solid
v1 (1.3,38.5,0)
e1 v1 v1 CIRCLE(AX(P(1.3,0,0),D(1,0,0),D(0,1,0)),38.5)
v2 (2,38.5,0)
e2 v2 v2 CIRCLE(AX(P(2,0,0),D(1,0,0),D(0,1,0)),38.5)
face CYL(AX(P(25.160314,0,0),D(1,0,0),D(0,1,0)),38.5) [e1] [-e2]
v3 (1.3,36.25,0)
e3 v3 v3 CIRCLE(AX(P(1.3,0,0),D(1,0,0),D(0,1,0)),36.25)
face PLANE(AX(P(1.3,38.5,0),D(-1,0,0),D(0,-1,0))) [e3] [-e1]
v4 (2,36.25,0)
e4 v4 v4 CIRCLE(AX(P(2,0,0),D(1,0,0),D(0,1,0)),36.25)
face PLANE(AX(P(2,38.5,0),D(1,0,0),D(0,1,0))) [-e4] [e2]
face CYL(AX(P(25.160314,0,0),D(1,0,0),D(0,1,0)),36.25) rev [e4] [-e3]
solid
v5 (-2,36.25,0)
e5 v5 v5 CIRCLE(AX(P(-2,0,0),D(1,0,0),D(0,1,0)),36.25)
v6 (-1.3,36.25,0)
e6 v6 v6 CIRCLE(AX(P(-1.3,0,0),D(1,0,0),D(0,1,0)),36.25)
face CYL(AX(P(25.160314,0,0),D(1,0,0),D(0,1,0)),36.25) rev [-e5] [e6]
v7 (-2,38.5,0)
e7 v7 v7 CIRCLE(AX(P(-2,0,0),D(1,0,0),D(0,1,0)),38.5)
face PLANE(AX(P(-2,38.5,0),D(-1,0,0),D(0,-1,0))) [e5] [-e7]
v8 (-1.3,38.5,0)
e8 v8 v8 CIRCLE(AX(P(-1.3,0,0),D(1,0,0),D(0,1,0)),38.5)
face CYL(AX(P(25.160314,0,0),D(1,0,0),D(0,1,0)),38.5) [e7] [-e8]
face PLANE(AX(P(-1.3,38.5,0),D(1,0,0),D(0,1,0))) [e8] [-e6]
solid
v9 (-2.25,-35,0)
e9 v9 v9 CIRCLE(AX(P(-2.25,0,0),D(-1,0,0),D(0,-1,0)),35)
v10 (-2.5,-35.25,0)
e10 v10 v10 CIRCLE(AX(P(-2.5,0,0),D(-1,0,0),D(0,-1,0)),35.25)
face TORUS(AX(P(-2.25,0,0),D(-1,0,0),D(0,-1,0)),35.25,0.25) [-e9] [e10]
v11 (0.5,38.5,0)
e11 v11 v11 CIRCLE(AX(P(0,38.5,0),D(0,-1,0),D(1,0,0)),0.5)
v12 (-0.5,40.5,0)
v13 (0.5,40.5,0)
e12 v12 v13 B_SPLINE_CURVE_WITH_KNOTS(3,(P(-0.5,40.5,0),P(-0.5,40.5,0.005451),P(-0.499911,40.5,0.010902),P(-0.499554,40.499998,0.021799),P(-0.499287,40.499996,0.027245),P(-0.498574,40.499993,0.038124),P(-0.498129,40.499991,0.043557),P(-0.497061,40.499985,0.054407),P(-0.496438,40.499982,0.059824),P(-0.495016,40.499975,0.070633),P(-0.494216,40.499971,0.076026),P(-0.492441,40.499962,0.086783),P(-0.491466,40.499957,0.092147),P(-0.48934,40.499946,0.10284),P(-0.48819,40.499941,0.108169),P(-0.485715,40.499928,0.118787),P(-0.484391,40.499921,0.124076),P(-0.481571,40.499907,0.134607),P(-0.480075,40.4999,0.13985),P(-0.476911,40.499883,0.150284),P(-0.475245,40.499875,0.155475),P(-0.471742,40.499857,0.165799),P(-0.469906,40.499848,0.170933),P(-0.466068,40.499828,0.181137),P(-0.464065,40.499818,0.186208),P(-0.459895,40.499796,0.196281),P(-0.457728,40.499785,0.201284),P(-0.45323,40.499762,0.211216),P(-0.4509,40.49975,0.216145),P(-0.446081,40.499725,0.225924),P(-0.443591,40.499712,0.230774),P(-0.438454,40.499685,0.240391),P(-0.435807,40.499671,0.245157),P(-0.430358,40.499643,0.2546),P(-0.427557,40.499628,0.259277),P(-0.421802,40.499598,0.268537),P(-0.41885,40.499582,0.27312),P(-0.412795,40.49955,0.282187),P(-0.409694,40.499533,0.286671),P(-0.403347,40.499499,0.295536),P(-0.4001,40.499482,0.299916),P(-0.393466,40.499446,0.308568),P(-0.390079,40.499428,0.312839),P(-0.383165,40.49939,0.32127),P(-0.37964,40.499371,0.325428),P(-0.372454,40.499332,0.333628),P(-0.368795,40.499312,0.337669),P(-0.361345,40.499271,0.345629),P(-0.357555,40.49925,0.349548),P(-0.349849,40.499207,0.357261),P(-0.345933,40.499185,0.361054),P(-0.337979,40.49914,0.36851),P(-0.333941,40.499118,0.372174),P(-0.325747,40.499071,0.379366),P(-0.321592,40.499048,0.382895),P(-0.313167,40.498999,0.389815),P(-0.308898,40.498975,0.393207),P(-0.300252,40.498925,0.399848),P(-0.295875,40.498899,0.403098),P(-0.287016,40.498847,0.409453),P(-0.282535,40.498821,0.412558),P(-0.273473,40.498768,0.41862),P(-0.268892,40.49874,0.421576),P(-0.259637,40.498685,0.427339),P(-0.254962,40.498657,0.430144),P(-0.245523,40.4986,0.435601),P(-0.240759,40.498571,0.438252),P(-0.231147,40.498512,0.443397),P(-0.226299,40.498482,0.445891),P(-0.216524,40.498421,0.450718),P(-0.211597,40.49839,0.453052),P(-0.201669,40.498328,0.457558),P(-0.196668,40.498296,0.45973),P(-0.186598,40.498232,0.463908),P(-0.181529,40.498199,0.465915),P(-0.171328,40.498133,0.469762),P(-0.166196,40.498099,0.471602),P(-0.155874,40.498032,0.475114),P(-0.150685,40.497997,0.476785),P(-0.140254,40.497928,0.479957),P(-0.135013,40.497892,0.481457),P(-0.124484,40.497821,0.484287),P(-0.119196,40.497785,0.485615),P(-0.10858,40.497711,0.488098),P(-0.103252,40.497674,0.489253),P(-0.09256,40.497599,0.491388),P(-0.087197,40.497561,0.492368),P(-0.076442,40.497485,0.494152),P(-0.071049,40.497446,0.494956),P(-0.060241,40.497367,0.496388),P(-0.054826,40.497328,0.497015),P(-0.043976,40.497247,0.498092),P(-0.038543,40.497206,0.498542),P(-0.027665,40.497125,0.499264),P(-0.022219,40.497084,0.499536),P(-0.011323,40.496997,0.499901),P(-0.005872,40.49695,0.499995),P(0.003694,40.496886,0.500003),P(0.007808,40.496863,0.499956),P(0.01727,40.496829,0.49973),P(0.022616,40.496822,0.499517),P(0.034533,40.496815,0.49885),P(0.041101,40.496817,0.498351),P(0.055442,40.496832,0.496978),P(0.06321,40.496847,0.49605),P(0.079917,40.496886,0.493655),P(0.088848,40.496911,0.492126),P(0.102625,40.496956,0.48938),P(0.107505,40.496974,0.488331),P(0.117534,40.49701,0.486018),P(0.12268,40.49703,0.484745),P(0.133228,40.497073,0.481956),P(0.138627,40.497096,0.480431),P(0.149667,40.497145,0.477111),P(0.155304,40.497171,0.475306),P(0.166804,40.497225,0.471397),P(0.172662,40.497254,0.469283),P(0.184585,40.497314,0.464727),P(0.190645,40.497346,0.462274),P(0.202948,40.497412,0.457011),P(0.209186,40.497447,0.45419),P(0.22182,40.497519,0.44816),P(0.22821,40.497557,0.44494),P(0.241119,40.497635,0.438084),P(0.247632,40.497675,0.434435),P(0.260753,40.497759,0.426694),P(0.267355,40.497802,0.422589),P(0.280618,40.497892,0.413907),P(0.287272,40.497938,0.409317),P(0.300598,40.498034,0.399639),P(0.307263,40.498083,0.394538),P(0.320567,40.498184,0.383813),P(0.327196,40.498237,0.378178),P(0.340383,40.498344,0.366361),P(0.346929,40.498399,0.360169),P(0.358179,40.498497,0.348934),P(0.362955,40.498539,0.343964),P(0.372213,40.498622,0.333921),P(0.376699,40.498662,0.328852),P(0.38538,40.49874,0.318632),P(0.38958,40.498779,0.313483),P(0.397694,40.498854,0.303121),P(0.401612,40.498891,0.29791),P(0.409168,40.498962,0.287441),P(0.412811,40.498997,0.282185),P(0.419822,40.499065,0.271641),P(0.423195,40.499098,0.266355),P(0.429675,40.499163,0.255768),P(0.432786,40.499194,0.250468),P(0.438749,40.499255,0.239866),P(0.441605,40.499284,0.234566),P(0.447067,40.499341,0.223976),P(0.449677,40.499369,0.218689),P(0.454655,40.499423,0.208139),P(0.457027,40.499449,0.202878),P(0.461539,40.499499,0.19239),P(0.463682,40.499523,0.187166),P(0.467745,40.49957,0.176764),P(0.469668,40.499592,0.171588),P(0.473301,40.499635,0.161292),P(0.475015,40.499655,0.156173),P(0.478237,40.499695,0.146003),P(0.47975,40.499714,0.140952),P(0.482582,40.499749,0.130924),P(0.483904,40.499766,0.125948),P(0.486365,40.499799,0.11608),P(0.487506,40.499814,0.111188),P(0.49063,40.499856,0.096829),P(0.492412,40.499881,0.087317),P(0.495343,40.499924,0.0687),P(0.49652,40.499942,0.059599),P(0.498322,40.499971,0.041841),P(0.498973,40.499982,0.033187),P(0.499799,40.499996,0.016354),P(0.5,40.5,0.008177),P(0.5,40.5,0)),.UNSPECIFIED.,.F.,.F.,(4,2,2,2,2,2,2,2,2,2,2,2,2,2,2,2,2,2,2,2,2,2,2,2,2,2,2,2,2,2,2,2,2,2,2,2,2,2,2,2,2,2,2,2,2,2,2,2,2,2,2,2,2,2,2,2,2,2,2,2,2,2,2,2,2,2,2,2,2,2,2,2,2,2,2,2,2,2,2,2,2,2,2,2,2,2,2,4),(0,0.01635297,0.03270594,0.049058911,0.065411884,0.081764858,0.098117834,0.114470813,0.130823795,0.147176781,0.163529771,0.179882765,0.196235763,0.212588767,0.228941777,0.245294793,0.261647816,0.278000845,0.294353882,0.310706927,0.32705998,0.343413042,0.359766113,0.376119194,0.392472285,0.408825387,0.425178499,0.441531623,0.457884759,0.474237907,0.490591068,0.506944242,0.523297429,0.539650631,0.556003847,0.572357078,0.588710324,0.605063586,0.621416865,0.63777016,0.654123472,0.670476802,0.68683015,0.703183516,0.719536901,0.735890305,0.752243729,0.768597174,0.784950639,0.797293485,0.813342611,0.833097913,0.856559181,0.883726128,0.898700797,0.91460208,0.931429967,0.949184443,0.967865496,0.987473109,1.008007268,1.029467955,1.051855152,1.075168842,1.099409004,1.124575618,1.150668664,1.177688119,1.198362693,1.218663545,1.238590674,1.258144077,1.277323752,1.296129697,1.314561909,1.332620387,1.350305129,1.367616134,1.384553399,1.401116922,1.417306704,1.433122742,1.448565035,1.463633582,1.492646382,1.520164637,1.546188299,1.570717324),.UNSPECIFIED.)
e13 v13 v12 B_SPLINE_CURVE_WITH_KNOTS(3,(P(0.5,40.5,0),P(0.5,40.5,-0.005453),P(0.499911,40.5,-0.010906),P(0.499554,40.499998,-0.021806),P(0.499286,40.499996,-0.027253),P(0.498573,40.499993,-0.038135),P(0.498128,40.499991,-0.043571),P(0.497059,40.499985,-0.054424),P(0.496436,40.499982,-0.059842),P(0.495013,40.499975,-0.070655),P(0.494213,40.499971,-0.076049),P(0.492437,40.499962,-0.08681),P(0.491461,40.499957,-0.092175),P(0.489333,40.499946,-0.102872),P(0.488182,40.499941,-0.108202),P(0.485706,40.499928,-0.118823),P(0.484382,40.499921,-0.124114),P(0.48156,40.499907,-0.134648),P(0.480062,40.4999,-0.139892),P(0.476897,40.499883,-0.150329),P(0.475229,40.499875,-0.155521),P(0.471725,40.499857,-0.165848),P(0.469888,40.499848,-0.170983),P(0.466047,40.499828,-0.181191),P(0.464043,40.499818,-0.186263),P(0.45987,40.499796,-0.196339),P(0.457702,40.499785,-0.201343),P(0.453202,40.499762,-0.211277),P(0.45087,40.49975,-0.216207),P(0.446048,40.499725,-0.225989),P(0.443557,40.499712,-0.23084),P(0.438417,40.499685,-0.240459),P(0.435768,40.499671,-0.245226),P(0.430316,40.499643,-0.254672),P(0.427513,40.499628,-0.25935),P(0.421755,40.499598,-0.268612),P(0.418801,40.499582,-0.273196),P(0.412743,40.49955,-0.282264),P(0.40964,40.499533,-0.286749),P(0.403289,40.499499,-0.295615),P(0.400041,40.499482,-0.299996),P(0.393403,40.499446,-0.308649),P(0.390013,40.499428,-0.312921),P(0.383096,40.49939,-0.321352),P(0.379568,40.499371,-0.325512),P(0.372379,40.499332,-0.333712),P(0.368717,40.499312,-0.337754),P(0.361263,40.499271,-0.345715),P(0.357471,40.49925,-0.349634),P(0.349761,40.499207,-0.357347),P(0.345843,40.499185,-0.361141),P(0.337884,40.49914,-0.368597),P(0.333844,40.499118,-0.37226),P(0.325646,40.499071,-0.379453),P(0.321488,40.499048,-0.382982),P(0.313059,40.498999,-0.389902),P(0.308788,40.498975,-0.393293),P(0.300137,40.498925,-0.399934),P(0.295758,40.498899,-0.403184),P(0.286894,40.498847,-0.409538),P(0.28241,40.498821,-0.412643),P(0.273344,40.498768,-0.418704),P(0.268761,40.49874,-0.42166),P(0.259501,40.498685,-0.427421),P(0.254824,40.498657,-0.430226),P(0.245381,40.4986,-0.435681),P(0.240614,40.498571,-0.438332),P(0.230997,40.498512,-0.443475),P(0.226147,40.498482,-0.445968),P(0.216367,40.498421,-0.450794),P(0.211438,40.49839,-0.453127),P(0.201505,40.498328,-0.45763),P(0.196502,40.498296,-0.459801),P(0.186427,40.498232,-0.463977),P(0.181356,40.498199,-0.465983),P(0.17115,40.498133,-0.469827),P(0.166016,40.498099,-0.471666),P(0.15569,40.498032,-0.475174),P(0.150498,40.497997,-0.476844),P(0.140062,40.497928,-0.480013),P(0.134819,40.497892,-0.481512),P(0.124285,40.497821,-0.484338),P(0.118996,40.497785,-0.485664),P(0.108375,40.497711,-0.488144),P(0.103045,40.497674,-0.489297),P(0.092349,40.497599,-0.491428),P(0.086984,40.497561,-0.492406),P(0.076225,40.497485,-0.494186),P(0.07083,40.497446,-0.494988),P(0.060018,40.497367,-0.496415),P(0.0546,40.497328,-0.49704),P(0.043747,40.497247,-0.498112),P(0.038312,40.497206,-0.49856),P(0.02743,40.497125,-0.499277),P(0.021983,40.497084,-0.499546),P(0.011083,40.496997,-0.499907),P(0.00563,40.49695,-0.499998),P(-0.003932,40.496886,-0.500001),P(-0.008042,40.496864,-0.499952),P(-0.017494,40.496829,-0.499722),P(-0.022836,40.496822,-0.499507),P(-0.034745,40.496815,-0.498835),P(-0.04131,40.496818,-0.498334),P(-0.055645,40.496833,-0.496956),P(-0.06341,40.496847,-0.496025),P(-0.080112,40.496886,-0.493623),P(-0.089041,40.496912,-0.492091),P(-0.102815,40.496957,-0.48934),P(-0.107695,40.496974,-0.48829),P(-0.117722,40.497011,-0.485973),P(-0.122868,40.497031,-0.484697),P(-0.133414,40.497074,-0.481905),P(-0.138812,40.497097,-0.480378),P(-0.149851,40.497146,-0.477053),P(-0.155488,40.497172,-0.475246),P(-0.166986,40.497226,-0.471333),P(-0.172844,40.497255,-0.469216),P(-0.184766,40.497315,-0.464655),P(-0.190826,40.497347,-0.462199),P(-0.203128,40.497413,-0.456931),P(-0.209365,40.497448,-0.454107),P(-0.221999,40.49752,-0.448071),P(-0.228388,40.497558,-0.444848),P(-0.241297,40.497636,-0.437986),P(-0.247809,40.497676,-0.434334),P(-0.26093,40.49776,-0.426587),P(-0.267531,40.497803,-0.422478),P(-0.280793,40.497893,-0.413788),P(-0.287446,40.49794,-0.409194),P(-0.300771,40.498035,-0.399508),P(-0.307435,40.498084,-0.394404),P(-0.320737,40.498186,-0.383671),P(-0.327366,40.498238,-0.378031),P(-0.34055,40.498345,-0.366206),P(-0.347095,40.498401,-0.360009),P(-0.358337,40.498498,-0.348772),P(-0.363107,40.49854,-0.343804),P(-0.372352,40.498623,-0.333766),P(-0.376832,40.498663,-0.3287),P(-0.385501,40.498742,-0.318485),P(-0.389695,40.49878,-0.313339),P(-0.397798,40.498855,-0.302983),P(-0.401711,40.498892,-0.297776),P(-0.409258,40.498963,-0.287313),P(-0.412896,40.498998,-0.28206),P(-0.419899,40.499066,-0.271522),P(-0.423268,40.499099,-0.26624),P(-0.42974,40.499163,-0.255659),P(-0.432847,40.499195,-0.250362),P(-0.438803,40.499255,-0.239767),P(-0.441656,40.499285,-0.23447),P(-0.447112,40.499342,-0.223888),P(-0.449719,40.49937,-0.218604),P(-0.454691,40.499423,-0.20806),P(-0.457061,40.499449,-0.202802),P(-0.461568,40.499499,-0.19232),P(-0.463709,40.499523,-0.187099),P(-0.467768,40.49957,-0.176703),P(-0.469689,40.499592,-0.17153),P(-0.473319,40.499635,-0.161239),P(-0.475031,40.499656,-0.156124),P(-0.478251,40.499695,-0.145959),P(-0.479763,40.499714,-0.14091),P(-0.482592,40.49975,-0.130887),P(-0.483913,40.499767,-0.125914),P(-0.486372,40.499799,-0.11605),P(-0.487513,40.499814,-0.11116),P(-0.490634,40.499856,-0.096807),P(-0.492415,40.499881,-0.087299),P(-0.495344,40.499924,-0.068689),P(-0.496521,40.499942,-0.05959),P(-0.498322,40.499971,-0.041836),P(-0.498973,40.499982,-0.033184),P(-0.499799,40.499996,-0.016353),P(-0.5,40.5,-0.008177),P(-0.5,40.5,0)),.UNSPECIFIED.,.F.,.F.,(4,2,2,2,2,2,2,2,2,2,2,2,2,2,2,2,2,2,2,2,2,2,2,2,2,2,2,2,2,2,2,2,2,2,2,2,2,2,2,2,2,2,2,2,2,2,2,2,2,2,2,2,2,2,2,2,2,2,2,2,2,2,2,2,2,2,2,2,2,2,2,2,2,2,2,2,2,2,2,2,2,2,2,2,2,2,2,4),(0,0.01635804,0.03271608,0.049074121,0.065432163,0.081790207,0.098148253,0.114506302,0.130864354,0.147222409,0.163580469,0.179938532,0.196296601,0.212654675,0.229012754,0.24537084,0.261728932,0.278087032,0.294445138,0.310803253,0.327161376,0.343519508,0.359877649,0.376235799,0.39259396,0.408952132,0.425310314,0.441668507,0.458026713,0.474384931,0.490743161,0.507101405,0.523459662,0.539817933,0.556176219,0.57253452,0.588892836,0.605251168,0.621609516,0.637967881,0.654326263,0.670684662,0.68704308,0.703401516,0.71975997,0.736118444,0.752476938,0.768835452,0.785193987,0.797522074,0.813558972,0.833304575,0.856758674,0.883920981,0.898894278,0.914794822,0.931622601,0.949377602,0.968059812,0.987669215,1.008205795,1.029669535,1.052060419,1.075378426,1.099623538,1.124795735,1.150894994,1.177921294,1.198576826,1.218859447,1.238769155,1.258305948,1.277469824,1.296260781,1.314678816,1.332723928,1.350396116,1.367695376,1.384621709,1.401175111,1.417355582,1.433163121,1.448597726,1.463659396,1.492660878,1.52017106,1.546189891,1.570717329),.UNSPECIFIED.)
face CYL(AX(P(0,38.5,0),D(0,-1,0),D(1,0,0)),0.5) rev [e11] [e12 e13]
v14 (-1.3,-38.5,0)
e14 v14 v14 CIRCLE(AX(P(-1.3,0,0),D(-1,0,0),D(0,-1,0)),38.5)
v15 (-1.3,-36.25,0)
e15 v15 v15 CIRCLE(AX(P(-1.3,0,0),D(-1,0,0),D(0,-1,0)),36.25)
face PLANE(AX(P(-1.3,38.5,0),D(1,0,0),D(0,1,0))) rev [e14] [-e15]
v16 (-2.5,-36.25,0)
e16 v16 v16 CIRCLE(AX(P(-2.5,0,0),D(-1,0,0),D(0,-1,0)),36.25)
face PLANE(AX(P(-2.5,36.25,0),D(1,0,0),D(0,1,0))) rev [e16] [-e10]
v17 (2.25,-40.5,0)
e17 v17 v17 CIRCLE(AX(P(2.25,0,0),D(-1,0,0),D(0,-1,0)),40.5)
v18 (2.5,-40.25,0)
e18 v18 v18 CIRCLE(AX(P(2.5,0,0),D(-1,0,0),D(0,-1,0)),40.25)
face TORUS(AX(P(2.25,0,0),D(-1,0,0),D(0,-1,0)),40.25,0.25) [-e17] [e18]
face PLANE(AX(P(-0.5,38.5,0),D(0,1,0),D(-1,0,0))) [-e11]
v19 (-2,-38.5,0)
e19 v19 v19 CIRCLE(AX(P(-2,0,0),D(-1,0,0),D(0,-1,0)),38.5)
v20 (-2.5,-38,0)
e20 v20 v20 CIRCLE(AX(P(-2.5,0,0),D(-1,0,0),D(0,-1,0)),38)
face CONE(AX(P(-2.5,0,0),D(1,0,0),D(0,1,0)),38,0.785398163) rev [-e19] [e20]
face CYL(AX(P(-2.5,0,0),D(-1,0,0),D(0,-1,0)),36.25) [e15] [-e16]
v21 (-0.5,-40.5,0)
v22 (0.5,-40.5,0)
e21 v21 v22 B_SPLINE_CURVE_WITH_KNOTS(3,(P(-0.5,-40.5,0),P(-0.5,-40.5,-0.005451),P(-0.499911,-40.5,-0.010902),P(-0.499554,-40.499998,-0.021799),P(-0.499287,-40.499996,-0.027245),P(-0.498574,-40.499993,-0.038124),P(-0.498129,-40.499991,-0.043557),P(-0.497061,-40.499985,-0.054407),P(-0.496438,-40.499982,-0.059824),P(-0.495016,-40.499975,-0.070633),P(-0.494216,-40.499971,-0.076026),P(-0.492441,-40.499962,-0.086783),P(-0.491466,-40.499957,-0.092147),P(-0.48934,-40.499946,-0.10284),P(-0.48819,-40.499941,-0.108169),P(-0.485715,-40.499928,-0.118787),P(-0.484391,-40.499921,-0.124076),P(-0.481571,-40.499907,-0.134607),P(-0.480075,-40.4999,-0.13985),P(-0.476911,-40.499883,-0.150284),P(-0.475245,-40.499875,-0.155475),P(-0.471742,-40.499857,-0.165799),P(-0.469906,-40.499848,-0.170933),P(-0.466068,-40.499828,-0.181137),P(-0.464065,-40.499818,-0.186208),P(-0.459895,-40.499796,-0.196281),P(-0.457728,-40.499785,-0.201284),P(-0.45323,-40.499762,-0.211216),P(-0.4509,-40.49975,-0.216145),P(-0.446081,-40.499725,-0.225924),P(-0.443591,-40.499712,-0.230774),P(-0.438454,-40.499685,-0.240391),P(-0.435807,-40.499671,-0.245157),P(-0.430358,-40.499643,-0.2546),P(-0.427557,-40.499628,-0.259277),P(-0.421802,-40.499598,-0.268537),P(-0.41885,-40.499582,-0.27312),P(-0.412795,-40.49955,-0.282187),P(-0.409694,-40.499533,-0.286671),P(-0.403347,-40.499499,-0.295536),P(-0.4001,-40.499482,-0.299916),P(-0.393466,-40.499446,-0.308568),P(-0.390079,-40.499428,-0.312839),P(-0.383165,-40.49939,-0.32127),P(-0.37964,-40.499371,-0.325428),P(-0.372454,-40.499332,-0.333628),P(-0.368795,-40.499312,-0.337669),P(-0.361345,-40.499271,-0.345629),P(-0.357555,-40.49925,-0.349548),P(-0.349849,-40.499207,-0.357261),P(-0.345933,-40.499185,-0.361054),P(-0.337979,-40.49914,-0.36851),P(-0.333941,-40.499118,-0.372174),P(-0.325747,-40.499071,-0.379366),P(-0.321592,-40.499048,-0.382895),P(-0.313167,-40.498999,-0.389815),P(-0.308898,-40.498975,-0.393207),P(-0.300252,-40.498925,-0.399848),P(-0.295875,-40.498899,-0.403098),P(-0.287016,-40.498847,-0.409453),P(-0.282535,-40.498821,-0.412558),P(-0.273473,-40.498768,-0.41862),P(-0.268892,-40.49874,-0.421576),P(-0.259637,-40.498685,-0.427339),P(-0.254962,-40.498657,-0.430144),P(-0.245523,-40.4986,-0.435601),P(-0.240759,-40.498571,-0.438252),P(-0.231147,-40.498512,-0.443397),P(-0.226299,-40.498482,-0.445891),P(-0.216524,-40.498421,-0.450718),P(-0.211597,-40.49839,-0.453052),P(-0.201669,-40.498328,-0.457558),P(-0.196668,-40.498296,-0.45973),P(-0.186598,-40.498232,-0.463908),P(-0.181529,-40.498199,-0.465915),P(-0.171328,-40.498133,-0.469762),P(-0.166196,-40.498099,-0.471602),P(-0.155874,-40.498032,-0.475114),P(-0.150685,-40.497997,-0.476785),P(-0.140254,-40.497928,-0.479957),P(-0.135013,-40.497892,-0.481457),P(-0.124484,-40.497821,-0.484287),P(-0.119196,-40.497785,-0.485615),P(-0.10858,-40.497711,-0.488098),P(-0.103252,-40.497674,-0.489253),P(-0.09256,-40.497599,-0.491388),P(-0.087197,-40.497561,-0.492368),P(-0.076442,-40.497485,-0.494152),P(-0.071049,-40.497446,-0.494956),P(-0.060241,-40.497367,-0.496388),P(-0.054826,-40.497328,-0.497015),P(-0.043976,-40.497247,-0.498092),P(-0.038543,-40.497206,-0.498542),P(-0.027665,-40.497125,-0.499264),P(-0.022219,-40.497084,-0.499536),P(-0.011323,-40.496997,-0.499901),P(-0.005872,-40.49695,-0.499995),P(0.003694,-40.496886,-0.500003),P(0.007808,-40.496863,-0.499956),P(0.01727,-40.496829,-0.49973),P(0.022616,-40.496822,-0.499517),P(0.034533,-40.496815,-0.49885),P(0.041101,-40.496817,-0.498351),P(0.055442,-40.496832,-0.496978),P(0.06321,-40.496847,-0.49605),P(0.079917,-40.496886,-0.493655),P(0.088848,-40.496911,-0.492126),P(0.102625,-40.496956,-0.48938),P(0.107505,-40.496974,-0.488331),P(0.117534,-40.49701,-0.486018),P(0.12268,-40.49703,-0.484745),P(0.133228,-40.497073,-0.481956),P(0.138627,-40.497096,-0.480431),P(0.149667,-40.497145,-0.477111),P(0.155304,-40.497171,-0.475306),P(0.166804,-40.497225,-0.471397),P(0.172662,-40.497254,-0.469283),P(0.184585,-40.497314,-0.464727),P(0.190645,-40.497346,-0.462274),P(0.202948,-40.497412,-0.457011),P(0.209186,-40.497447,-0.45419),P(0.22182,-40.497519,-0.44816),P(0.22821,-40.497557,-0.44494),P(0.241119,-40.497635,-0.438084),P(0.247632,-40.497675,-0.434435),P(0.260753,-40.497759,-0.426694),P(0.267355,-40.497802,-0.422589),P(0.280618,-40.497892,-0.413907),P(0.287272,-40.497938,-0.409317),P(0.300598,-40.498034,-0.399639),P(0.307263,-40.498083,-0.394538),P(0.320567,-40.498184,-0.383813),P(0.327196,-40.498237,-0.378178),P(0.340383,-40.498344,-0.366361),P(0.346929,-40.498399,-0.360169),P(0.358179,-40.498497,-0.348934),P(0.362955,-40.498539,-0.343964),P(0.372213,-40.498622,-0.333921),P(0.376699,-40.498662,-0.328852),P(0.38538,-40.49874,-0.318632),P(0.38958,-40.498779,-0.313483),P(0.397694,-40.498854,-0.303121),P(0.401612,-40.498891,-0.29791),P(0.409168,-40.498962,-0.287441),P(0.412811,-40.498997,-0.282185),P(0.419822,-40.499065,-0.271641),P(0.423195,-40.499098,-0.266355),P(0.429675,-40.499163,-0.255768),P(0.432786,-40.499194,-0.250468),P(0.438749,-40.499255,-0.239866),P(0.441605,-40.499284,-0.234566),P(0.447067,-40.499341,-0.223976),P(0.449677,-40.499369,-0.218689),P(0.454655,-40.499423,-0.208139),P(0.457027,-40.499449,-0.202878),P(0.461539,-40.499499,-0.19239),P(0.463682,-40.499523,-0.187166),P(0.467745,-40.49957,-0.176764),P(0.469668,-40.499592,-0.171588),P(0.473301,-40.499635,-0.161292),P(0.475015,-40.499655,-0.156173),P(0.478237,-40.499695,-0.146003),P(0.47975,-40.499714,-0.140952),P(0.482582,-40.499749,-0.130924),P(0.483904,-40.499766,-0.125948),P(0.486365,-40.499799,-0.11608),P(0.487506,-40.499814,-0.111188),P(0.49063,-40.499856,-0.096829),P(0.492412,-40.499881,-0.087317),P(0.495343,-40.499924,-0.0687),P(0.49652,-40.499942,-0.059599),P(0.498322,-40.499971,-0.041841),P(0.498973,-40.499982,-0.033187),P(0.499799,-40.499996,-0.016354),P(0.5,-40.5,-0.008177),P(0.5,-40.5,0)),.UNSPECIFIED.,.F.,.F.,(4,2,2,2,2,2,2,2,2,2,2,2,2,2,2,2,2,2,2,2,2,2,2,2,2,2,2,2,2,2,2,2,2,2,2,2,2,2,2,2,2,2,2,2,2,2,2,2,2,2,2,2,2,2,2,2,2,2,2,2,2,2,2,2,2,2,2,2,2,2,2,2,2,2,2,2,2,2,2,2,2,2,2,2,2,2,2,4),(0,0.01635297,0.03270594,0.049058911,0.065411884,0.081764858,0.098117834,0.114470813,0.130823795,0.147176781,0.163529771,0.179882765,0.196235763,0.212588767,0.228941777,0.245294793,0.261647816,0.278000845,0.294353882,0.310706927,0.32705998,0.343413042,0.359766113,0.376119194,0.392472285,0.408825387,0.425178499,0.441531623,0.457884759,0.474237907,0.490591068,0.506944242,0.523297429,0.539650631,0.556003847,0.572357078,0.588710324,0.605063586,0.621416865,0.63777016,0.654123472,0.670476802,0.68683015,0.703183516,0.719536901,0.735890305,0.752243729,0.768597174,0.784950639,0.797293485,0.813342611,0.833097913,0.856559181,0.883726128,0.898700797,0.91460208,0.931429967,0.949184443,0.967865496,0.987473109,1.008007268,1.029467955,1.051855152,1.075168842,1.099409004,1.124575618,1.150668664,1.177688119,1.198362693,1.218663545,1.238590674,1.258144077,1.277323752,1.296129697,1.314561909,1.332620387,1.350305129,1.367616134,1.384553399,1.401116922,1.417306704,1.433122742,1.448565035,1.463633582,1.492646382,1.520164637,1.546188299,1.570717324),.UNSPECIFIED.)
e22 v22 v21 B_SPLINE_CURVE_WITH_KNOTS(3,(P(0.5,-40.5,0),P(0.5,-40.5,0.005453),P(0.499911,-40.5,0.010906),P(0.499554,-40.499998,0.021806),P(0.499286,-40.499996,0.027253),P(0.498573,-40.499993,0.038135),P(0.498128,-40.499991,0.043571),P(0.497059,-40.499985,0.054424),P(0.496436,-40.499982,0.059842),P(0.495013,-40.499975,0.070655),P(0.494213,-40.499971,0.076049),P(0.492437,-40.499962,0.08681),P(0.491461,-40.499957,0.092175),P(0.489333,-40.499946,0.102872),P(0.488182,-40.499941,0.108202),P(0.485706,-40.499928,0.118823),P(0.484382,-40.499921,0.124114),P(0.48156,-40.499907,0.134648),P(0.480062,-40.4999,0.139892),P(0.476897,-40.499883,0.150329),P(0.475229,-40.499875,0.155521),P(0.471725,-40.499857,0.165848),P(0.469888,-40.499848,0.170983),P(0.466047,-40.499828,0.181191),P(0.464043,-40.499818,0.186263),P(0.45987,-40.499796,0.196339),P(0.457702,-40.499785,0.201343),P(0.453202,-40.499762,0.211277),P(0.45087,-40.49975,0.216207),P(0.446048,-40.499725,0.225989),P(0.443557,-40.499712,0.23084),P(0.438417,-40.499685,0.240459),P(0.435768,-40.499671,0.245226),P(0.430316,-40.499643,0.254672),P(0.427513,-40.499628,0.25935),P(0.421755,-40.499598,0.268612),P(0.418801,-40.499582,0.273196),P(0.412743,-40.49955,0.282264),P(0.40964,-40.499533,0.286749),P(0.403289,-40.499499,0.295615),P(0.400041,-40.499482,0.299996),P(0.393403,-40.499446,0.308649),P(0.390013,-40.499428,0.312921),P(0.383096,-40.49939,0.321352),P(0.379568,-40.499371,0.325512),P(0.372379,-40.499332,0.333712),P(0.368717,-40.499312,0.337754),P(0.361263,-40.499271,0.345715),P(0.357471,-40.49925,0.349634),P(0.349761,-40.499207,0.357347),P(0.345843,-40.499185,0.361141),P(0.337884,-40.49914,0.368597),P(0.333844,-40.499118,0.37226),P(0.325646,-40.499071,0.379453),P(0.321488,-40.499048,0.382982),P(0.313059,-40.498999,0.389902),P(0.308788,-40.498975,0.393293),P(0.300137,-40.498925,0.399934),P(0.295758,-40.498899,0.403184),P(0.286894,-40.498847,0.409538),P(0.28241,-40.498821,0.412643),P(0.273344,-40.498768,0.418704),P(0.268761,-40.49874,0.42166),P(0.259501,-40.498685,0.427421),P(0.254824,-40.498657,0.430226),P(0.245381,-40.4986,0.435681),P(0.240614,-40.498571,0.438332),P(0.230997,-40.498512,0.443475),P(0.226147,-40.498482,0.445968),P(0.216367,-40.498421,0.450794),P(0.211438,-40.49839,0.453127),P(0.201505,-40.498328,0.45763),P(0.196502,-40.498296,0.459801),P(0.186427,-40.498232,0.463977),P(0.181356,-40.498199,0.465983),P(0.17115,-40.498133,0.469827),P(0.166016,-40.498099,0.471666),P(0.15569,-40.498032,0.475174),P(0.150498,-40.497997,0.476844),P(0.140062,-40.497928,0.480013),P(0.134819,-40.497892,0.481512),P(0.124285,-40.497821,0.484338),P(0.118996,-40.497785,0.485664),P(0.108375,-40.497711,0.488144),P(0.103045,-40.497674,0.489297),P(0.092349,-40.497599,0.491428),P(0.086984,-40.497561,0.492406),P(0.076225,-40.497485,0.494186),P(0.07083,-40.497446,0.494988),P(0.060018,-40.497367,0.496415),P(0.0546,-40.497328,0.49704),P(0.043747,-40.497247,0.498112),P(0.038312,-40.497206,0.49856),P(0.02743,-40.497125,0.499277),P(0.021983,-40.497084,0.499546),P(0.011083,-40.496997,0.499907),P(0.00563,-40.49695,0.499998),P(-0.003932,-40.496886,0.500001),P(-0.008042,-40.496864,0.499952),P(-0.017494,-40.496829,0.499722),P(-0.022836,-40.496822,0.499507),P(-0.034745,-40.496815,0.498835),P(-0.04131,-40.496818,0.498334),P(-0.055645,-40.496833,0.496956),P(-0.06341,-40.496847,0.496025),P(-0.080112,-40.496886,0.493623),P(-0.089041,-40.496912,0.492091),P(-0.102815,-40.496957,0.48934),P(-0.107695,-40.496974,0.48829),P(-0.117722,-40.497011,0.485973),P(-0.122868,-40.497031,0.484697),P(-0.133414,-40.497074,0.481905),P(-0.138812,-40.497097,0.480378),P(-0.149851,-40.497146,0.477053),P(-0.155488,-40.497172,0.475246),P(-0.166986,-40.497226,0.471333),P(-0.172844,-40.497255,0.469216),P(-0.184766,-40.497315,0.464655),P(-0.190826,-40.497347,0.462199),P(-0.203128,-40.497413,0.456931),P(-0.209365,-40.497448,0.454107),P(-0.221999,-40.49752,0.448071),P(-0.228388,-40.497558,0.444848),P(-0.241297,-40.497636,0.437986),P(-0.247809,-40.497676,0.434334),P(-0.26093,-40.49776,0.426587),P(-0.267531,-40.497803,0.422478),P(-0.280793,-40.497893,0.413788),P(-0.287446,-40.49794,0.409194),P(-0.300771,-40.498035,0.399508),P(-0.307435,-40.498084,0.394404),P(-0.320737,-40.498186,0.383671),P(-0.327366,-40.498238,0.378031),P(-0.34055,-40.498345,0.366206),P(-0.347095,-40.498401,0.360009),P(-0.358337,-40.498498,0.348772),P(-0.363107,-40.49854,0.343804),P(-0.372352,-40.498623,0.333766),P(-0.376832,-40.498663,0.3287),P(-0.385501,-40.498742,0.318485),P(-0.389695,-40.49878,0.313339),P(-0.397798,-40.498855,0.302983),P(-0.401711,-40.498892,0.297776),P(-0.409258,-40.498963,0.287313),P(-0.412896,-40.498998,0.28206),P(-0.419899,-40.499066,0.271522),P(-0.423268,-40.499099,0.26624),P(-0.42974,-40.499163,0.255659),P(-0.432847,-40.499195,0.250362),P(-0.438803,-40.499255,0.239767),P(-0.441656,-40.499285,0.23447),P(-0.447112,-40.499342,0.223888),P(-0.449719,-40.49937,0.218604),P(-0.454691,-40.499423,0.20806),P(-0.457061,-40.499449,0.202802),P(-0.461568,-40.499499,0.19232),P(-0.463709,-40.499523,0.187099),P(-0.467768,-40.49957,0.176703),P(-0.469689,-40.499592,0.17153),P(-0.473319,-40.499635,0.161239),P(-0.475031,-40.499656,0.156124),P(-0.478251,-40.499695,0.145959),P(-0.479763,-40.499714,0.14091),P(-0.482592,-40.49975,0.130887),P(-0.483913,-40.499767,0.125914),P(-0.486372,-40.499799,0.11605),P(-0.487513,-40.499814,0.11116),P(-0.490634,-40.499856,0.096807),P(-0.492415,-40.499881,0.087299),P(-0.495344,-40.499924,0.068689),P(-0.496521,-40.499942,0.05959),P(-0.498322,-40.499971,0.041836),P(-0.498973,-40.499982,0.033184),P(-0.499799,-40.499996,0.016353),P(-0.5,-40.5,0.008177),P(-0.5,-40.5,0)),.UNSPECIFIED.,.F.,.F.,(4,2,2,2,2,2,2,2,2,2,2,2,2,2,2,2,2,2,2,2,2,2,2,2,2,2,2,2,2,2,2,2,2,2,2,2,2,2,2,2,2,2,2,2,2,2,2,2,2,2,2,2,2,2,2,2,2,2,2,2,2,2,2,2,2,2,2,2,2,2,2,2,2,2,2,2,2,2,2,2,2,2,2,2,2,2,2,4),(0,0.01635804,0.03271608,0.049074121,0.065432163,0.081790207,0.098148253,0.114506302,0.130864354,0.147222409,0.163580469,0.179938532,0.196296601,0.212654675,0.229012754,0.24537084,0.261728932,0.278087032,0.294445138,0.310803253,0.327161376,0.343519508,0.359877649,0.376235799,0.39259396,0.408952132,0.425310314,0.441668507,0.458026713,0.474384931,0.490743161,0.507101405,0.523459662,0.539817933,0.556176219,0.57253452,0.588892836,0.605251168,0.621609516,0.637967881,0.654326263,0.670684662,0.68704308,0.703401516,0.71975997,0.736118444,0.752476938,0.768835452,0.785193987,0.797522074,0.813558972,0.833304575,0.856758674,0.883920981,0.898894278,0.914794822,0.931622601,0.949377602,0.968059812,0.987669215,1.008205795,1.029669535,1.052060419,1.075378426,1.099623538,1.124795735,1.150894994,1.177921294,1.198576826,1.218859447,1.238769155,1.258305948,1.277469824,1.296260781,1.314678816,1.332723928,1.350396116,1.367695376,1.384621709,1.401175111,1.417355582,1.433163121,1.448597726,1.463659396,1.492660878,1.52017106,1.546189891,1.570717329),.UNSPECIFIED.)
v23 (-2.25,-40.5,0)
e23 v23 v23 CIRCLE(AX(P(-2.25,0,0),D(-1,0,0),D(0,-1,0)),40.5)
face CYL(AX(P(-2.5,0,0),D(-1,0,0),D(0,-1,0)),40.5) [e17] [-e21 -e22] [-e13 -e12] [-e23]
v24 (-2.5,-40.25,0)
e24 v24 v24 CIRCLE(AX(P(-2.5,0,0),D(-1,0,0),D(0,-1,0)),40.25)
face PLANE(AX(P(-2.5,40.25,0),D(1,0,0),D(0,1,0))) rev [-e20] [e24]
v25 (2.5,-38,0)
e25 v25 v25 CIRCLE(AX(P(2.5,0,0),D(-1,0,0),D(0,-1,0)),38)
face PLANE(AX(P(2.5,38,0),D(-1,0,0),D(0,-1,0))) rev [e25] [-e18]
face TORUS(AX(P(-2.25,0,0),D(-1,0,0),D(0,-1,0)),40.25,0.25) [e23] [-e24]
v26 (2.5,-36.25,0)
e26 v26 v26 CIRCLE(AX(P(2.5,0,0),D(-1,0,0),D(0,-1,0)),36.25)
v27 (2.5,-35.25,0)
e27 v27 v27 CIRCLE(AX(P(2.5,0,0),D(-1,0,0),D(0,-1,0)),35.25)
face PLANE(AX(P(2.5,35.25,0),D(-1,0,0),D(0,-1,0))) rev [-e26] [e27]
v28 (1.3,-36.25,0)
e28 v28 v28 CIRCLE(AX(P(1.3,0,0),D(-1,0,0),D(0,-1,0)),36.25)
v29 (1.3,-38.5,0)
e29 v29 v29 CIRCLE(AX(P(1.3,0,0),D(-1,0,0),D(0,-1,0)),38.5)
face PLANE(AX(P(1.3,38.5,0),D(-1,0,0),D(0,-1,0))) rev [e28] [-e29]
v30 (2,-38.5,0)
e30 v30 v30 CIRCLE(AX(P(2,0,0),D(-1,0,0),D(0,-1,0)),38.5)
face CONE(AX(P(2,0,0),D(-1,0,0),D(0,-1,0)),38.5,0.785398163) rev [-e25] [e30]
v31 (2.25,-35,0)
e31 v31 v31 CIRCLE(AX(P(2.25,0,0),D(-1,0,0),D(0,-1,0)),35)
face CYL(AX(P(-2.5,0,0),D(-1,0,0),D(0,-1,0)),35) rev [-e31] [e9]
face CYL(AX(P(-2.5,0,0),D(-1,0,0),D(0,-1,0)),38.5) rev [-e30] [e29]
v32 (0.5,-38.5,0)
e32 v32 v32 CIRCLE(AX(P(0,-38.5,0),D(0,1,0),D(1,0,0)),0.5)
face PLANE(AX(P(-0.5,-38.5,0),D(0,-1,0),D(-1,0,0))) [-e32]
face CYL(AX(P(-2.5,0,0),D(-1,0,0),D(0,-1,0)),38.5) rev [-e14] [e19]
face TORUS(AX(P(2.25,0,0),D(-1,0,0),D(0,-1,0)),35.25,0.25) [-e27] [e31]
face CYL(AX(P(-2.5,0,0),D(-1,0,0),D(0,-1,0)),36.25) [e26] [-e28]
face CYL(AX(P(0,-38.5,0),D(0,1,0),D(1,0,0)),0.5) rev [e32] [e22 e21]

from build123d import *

# Parameters (mm, degrees)
REVOLVE2_OUTLINE_W = 2.25
REVOLVE2_OUTLINE_H = 0.7
SKETCH5_W          = 0.5
SKETCH5_H          = 2
CIRPATTERN1_COUNT  = 2


# Read off the part's stored shape, not the designer's step: Revolve2
with BuildPart() as part:
    # Sketch3 → Revolve1 (revolve)
    with BuildSketch(Plane.XY, mode=Mode.PRIVATE) as revolve1_sk:
        with BuildLine():
            Line((-2, 36.25), (-2.5, 36.25))
            Line((-2.5, 36.25), (-2.5, 35.25))
            ThreePointArc((-2.5, 35.25), (-2.426776695, 35.073223305), (-2.25, 35))
            Line((-2.25, 35), (2.25, 35))
            ThreePointArc((2.25, 35), (2.426776695, 35.073223305), (2.5, 35.25))
            Line((2.5, 35.25), (2.5, 36.25))
            Line((2.5, 36.25), (2, 36.25))
            Line((2, 36.25), (1.3, 36.25))
            Line((1.3, 36.25), (1.3, 38.5))
            Line((1.3, 38.5), (2, 38.5))
            Line((2, 38.5), (2.5, 38))
            Line((2.5, 38), (2.5, 38.5))
            Line((2.5, 38.5), (2.5, 40.25))
            ThreePointArc((2.5, 40.25), (2.426776695, 40.426776695), (2.25, 40.5))
            Line((2.25, 40.5), (-2.25, 40.5))
            ThreePointArc((-2.25, 40.5), (-2.426776695, 40.426776695), (-2.5, 40.25))
            Line((-2.5, 40.25), (-2.5, 38.5))
            Line((-2.5, 38.5), (-2.5, 38))
            Line((-2.5, 38), (-2, 38.5))
            Line((-2, 38.5), (-1.3, 38.5))
            Line((-1.3, 38.5), (-1.3, 36.25))
            Line((-1.3, 36.25), (-2, 36.25))
        make_face()
    revolve(revolve1_sk.sketch.rotate(Axis((-2.5, 0, 0), (1, 0, 0)), 180), axis=Axis((-2.5, 0, 0), (1, 0, 0)))

    # Sketch5 → Cut-Revolve1 (revolve, cut)
    with BuildSketch(Plane.XY, mode=Mode.PRIVATE) as cut_revolve1_sk:
        with Locations((-0.25, 39.5)):
            Rectangle(SKETCH5_W, SKETCH5_H)
    cut_revolve1 = revolve(cut_revolve1_sk.sketch.rotate(Axis((0, 38.5, 0), (0, 1, 0)), 180), axis=Axis((0, 38.5, 0), (0, 1, 0)), mode=Mode.SUBTRACT)

    # CirPattern1: Cut-Revolve1 ×2 about axis
    cirpattern1_axis = Axis((0, 0, 0), (-1, 0, 0))
    for i in range(1, CIRPATTERN1_COUNT):
        add(cut_revolve1.rotate(cirpattern1_axis, i * 360 / CIRPATTERN1_COUNT), mode=Mode.SUBTRACT)


with BuildPart() as body_2:
    # Revolve2 outline → Revolve2 (revolve)
    with BuildSketch(Plane.YX):
        with Locations((37.375, 1.65)):
            Rectangle(REVOLVE2_OUTLINE_W, REVOLVE2_OUTLINE_H)
        with Locations((37.375, -1.65)):
            Rectangle(REVOLVE2_OUTLINE_W, REVOLVE2_OUTLINE_H)
    revolve(axis=Axis((0, 0, 0), (1, 0, 0)))


solid = Compound([part.part, body_2.part])
